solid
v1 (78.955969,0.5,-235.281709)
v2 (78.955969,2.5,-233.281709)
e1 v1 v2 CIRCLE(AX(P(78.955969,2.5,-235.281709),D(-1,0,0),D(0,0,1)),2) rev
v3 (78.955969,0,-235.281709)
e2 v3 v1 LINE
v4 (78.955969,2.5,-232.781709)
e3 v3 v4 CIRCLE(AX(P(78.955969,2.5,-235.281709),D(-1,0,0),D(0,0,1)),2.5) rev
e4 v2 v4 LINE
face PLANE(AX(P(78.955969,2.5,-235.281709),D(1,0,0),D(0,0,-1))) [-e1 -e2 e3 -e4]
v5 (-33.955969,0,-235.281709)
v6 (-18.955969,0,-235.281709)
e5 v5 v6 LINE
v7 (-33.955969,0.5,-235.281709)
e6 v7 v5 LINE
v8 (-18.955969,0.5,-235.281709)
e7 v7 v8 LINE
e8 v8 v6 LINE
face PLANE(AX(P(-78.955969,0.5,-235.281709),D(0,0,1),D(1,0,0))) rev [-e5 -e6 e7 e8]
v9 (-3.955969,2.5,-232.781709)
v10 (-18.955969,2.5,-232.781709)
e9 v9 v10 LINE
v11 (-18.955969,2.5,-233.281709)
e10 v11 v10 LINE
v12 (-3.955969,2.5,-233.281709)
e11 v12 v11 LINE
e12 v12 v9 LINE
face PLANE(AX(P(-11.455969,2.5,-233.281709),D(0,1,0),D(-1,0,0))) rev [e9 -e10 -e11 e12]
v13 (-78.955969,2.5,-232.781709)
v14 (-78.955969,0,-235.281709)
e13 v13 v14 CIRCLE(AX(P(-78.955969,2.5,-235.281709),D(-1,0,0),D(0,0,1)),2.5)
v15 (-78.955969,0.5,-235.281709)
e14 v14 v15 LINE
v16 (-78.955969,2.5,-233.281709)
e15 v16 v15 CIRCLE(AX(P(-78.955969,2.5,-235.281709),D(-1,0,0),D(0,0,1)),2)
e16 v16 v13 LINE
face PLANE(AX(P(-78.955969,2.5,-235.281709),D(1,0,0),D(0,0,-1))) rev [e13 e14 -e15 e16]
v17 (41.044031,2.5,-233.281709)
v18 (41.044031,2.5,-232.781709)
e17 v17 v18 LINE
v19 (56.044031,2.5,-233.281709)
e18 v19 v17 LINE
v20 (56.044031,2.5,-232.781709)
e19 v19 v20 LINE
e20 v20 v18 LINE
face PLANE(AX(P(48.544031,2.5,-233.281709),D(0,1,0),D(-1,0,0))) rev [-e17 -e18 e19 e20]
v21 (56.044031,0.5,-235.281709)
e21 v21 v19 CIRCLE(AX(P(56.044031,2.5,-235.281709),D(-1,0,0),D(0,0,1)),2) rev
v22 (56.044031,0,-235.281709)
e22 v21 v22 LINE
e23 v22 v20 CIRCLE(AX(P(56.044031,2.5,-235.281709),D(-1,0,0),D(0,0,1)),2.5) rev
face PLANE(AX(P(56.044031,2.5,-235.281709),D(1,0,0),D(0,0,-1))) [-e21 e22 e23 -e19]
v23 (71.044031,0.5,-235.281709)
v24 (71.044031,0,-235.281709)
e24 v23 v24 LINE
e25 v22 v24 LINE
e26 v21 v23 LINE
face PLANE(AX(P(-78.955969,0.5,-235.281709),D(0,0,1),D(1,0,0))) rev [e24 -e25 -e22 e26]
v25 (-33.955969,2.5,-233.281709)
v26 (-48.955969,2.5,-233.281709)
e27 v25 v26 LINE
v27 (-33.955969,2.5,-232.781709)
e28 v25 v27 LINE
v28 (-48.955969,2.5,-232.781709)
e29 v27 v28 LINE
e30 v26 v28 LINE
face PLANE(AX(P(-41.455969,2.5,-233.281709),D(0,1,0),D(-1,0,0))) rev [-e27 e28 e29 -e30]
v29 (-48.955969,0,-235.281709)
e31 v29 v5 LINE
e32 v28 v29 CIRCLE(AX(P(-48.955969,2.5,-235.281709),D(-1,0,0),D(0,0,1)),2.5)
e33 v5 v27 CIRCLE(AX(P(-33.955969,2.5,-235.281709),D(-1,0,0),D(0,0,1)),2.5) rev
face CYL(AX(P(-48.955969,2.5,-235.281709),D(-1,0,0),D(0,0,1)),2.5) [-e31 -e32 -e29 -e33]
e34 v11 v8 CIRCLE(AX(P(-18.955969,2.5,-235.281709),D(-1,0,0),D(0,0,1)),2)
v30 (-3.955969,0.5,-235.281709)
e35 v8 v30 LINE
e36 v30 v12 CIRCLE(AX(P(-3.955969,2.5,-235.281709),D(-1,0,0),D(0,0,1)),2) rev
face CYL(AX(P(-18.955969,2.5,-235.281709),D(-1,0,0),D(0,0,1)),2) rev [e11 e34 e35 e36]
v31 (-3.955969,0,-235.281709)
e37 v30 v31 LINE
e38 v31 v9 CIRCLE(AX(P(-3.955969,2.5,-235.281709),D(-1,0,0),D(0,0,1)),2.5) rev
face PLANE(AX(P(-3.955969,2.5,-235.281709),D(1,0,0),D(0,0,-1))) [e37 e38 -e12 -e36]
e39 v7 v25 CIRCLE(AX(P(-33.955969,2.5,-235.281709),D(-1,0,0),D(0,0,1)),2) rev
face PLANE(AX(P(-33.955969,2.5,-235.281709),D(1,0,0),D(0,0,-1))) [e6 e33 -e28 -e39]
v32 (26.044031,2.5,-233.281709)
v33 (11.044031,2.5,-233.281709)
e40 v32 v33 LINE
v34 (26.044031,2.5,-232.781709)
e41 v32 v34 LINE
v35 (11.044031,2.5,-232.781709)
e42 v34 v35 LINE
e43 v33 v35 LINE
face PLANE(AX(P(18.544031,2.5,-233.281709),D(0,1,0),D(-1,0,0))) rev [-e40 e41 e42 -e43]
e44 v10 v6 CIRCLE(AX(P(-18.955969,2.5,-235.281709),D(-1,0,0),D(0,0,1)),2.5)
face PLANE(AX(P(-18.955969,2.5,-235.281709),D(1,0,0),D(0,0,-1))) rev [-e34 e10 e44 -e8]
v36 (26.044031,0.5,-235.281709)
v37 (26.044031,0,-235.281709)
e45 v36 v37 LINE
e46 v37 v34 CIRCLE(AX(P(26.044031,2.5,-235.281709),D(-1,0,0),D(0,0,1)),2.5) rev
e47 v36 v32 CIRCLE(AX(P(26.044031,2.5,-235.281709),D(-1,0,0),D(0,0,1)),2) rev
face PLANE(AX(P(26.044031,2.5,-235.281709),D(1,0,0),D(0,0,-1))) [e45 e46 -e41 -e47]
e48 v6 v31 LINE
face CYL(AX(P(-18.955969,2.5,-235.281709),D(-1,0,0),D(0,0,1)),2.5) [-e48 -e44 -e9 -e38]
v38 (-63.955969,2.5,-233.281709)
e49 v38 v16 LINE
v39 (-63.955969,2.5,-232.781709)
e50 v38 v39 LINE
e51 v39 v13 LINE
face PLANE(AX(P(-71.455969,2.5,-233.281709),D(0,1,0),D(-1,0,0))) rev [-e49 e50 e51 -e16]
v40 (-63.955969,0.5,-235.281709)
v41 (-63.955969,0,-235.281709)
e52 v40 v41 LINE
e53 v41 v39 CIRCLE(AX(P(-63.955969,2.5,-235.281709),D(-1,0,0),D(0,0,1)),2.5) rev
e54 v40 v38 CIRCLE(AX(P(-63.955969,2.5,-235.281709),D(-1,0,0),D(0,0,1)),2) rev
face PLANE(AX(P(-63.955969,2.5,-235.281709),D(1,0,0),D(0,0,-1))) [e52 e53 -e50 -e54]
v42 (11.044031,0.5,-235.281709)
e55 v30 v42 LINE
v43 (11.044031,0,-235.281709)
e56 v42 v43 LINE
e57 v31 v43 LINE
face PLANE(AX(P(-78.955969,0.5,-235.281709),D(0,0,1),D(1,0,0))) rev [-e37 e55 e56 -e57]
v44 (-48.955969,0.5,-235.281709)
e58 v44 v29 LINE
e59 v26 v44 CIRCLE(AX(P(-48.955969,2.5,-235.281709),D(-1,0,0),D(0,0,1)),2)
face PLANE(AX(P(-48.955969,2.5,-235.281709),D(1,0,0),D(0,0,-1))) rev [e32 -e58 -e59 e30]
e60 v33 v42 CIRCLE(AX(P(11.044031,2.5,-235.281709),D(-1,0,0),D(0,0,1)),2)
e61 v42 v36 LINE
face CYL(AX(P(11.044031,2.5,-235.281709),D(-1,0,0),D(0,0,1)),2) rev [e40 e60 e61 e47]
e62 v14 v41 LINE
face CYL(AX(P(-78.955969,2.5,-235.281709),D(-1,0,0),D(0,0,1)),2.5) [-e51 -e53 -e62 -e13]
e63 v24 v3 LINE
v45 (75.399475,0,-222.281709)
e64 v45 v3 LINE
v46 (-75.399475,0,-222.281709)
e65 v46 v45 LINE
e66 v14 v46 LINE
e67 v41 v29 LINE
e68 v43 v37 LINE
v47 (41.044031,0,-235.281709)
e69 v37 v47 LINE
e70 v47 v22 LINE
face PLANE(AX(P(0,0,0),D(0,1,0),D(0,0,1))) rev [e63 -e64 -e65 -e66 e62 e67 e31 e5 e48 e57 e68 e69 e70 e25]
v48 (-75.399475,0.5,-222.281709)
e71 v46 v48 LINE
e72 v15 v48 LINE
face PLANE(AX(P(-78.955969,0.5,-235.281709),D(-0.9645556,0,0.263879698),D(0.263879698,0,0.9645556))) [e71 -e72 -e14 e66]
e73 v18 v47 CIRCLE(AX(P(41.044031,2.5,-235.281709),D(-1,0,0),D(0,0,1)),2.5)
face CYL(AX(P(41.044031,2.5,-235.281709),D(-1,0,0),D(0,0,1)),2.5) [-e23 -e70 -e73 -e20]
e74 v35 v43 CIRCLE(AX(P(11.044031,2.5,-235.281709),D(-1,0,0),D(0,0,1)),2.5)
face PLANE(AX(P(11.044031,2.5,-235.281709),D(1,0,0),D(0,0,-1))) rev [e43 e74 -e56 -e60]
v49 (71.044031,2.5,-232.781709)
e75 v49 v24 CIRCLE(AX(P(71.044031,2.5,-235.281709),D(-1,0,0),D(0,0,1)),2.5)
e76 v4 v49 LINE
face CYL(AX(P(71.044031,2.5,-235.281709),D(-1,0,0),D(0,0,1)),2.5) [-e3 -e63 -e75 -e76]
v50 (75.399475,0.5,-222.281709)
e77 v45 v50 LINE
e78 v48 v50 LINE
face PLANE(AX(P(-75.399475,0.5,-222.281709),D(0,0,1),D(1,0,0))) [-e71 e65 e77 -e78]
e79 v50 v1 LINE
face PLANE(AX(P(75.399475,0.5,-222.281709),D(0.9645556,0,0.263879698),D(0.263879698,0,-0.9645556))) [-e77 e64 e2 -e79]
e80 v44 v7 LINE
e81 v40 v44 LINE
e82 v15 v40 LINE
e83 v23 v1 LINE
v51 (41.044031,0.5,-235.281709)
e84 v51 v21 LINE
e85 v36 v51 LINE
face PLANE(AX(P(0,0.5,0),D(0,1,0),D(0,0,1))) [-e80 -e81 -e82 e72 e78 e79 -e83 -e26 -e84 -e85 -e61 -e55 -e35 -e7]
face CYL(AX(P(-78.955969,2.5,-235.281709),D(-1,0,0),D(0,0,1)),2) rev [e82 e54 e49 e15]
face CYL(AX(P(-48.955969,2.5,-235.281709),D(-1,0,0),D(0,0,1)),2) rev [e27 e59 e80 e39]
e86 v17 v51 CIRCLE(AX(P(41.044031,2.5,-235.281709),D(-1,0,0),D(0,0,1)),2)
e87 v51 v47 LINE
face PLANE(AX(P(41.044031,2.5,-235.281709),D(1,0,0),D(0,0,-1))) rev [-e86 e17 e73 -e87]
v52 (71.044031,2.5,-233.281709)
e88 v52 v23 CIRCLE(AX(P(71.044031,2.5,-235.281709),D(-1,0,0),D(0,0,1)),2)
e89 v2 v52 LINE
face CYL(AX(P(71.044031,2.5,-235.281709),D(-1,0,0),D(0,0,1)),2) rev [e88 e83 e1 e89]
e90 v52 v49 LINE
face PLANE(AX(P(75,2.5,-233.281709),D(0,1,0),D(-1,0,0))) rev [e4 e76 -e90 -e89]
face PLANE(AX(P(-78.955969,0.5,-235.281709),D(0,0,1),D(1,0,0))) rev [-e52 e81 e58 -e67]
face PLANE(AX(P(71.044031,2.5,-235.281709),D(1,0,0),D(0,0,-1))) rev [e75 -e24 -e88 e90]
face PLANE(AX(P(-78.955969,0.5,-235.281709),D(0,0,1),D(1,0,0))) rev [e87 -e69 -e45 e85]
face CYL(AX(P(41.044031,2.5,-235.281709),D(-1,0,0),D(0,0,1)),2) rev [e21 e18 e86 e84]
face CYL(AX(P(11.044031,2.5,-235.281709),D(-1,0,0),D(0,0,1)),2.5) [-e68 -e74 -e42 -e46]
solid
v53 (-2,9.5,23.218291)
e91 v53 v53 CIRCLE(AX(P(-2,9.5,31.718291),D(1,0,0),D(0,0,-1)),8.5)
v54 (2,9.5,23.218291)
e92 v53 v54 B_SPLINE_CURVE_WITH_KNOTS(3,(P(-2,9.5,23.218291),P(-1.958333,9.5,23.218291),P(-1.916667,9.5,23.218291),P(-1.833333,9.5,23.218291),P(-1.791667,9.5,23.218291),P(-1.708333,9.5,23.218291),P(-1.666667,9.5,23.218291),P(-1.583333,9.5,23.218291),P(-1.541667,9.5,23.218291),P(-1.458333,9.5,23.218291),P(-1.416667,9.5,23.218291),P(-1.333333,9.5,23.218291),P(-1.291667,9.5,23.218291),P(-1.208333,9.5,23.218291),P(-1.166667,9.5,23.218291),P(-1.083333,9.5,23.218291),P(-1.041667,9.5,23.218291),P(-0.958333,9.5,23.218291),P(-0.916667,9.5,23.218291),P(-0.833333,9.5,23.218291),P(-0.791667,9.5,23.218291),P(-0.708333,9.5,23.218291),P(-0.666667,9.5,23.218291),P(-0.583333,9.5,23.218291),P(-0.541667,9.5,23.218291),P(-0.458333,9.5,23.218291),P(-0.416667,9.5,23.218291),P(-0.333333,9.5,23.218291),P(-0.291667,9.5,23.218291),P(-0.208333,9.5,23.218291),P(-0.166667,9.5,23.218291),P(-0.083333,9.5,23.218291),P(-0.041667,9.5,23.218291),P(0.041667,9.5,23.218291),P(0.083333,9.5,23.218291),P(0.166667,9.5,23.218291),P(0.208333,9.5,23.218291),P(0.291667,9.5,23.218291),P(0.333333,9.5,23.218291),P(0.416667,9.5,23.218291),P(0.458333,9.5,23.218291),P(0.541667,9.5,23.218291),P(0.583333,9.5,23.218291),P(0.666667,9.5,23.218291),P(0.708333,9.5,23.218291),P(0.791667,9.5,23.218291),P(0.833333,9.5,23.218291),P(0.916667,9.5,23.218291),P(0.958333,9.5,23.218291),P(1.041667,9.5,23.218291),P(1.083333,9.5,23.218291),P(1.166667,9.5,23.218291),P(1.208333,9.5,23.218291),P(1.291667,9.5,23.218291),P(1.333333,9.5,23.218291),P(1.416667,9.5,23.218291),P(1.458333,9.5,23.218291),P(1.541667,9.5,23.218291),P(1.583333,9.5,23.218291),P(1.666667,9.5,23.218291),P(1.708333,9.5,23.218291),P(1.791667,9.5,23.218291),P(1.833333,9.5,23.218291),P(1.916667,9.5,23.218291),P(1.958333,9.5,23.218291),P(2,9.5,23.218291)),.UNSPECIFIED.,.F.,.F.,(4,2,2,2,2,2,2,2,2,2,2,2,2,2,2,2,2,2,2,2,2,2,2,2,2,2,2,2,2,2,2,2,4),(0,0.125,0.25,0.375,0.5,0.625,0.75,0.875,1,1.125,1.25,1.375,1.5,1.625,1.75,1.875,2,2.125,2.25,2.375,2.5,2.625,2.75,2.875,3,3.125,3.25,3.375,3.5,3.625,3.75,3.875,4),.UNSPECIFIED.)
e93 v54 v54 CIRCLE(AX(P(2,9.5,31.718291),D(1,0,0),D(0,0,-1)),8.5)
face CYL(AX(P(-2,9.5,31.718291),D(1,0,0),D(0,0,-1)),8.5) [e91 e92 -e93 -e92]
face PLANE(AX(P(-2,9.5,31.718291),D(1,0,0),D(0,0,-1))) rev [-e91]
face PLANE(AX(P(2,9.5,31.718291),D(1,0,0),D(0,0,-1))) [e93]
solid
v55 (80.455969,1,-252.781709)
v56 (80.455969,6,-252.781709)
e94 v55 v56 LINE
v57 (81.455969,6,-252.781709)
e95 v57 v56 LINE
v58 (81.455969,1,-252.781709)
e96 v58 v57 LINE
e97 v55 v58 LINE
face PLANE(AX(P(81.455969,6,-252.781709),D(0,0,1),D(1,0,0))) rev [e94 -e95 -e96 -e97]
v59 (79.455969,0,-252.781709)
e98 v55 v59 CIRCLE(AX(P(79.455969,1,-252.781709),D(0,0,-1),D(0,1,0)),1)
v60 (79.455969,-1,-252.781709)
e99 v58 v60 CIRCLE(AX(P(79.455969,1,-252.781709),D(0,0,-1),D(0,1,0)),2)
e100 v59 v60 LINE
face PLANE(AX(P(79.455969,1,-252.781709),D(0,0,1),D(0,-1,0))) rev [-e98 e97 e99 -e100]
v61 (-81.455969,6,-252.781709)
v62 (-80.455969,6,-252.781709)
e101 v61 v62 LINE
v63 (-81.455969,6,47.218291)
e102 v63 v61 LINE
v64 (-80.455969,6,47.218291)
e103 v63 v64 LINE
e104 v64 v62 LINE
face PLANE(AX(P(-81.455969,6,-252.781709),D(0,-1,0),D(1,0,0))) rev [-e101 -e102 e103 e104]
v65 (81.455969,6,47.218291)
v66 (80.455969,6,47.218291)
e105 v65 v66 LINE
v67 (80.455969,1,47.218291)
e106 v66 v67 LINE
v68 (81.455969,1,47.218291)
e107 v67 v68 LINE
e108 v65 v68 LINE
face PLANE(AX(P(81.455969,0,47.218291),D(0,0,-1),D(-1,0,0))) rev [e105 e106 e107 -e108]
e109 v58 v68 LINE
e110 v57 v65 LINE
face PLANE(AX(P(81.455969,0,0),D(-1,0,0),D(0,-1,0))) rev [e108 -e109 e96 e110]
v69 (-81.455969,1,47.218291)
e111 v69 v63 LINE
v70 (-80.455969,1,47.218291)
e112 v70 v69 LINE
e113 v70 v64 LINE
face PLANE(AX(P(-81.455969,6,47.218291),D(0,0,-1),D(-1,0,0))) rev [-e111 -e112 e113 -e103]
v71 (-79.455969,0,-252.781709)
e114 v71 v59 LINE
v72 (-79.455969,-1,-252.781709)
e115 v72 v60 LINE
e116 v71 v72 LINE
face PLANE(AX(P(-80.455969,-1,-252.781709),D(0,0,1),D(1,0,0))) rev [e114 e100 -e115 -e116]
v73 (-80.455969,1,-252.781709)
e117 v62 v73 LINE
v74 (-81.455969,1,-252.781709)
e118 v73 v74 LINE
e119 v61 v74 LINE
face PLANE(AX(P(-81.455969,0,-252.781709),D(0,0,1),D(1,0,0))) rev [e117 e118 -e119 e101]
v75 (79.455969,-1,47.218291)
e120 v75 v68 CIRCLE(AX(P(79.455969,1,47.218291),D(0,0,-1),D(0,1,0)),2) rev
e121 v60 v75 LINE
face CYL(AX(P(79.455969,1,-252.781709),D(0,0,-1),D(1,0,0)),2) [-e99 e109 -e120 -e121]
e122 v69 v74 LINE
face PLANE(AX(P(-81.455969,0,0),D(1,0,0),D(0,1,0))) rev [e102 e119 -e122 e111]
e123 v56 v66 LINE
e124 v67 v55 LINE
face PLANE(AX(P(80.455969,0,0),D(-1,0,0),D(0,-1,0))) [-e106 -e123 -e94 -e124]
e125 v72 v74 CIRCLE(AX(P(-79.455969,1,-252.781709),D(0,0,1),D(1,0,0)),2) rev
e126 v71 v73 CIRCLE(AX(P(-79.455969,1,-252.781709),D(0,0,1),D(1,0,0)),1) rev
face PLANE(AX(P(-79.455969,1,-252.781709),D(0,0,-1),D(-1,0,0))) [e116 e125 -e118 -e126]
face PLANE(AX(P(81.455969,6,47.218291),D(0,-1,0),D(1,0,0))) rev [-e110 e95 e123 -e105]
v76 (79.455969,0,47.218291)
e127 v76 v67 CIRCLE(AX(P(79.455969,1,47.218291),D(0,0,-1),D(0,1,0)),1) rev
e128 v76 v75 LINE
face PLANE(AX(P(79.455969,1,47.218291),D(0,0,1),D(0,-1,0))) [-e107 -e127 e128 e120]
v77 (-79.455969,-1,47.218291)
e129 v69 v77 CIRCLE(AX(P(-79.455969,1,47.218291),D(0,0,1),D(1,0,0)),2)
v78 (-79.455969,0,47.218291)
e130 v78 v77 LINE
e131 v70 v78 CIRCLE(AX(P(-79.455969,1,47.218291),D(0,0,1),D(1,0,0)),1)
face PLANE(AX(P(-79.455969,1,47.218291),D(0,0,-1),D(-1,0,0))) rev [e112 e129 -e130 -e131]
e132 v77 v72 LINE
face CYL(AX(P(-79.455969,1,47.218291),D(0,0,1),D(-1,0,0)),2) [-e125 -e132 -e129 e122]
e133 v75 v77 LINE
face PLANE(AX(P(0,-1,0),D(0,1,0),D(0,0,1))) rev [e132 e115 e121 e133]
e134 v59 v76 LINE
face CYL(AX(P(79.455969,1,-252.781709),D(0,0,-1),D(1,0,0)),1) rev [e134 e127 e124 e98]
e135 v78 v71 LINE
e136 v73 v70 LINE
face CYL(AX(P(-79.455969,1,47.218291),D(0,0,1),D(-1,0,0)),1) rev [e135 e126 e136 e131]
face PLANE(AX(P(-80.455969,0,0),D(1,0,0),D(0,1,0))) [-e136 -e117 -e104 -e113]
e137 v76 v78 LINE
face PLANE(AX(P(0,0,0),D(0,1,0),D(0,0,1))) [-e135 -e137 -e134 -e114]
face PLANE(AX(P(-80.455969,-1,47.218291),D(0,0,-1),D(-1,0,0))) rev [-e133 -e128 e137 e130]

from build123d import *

# Parameters (mm, degrees)
EXTRUDE_1_DEPTH                    = 0.5
OTHER_START                        = -78.955969349
OTHER_1_DEPTH                      = 15
PATTERN_LINEAR_2_COUNT             = 5
PATTERN_LINEAR_2_PITCH             = 30
OTHER_START_2                      = 71.044030651
OTHER_3_DEPTH                      = 7.911938698
SKETCH_14_W                        = 160.911938698
SKETCH_14_H                        = 300
SM_BASE_FLANGE_1_DEPTH             = 1
SM_EDGE_FLANGE_1_STRIP_W           = 6
SM_EDGE_FLANGE_1_STRIP_H           = 1
SM_EDGE_FLANGE_1_STRIP_CUT_DEPTH   = 300
SM_EDGE_FLANGE_1_STRIP_2_W         = 6
SM_EDGE_FLANGE_1_STRIP_2_H         = 1
SM_EDGE_FLANGE_1_STRIP_CUT_2_DEPTH = 300
SM_EDGE_FLANGE_1_DEPTH             = 300
SM_EDGE_FLANGE_1_BEND_DEPTH        = 300
EXTRUDE_2_DEPTH                    = 2
EXTRUDE_2_DEPTH_BACK               = 2
SKETCH_23_R                        = 8.5


# Read off the part's stored shape, not the designer's step: Каемка1, Каемка3
# Sheet-metal steps are written as plain solids
with BuildPart() as part:
    # Sketch 1 → Бобышка-Вытянуть1 (new body)
    with BuildSketch(Plane(origin=(0, 0, 0), x_dir=(1, 0, 0), z_dir=(0, 1, 0))):
        Polygon((-78.955969349, 235.281709088), (78.955969349, 235.281709088), (75.399475479, 222.281709088), (-75.399475479, 222.281709088), align=None)
    extrude(amount=EXTRUDE_1_DEPTH)

    # Other 1 outline → Other 1 (add)
    with BuildSketch(Plane.YZ.offset(OTHER_START)):
        with BuildLine():
            Line((2.5, -232.781709088), (2.5, -233.281709088))
            ThreePointArc((2.5, -233.281709088), (3.914213562, -236.69592265), (0.5, -235.281709088))
            Line((0.5, -235.281709088), (0, -235.281709088))
            ThreePointArc((0, -235.281709088), (4.267766953, -237.049476041), (2.5, -232.781709088))
        make_face()
    other_1 = extrude(amount=OTHER_1_DEPTH)

    # Линейный массив2: Other 1 ×5
    with Locations(*[(i * PATTERN_LINEAR_2_PITCH, 0, 0) for i in range(1, PATTERN_LINEAR_2_COUNT)]):
        add(other_1)

    # Other 3 outline → Other 3 (add)
    with BuildSketch(Plane.YZ.offset(OTHER_START_2)):
        with BuildLine():
            Line((2.5, -232.781709088), (2.5, -233.281709088))
            ThreePointArc((2.5, -233.281709088), (3.914213562, -236.69592265), (0.5, -235.281709088))
            Line((0.5, -235.281709088), (0, -235.281709088))
            ThreePointArc((0, -235.281709088), (4.267766953, -237.049476041), (2.5, -232.781709088))
        make_face()
    extrude(amount=OTHER_3_DEPTH)


with BuildPart() as body_2:
    # Эскиз14 → Базовая кромка1 (new body)
    with BuildSketch(Plane.XZ):
        with Locations((0, -102.781709088)):
            Rectangle(SKETCH_14_W, SKETCH_14_H)
    extrude(amount=SM_BASE_FLANGE_1_DEPTH)

    # Ребро-кромка1 strip (across the edge) → Ребро-кромка1 strip cut (cut)
    with BuildSketch(Plane(origin=(-80.455969349, 0, -252.781709088), x_dir=(1, 0, 0), z_dir=(0, 0, 1))):
        with Locations((-2, -0.5)):
            Rectangle(SM_EDGE_FLANGE_1_STRIP_W, SM_EDGE_FLANGE_1_STRIP_H)
    extrude(amount=SM_EDGE_FLANGE_1_STRIP_CUT_DEPTH, mode=Mode.SUBTRACT)

    # Ребро-кромка1 strip 2 (across the edge) → Ребро-кромка1 strip cut 2 (cut)
    with BuildSketch(Plane(origin=(80.455969349, 0, 47.218290912), x_dir=(-1, 0, 0), z_dir=(0, 0, -1))):
        with Locations((-2, -0.5)):
            Rectangle(SM_EDGE_FLANGE_1_STRIP_2_W, SM_EDGE_FLANGE_1_STRIP_2_H)
    extrude(amount=SM_EDGE_FLANGE_1_STRIP_CUT_2_DEPTH, mode=Mode.SUBTRACT)

    # Ребро-кромка1 section (across the edge) → Ребро-кромка1 (add)
    with BuildSketch(Plane(origin=(-80.455969349, 0, -252.781709088), x_dir=(1, 0, 0), z_dir=(0, 0, 1))):
        with BuildLine():
            Line((-1, 1), (-1, 6))
            Line((-1, 6), (0, 6))
            Line((0, 6), (0, 1))
            ThreePointArc((0, 1), (0.292893219, 0.292893219), (1, 0))
            Line((1, 0), (1, -1))
            ThreePointArc((1, -1), (-0.414213562, -0.414213562), (-1, 1))
        make_face()
    extrude(amount=SM_EDGE_FLANGE_1_DEPTH)

    # Ребро-кромка1 section 2 (across the edge) → Ребро-кромка1 bend (add)
    with BuildSketch(Plane(origin=(80.455969349, 0, 47.218290912), x_dir=(-1, 0, 0), z_dir=(0, 0, -1))):
        with BuildLine():
            Line((-1, 1), (-1, 6))
            Line((-1, 6), (0, 6))
            Line((0, 6), (0, 1))
            ThreePointArc((0, 1), (0.292893219, 0.292893219), (1, 0))
            Line((1, 0), (1, -1))
            ThreePointArc((1, -1), (-0.414213562, -0.414213562), (-1, 1))
        make_face()
    extrude(amount=SM_EDGE_FLANGE_1_BEND_DEPTH)


with BuildPart() as body_3:
    # Эскиз23 → Бобышка-Вытянуть2 (new, two sides: drawn at the far end of the back side and taken through both)
    with BuildSketch(Plane(origin=(0, 0, 0), x_dir=(0, 0, -1), z_dir=(1, 0, 0)).offset(-EXTRUDE_2_DEPTH_BACK)):
        with Locations((-31.718290912, 9.5)):
            Circle(SKETCH_23_R)
    extrude(amount=EXTRUDE_2_DEPTH + EXTRUDE_2_DEPTH_BACK)


solid = Compound([part.part, body_2.part, body_3.part])
